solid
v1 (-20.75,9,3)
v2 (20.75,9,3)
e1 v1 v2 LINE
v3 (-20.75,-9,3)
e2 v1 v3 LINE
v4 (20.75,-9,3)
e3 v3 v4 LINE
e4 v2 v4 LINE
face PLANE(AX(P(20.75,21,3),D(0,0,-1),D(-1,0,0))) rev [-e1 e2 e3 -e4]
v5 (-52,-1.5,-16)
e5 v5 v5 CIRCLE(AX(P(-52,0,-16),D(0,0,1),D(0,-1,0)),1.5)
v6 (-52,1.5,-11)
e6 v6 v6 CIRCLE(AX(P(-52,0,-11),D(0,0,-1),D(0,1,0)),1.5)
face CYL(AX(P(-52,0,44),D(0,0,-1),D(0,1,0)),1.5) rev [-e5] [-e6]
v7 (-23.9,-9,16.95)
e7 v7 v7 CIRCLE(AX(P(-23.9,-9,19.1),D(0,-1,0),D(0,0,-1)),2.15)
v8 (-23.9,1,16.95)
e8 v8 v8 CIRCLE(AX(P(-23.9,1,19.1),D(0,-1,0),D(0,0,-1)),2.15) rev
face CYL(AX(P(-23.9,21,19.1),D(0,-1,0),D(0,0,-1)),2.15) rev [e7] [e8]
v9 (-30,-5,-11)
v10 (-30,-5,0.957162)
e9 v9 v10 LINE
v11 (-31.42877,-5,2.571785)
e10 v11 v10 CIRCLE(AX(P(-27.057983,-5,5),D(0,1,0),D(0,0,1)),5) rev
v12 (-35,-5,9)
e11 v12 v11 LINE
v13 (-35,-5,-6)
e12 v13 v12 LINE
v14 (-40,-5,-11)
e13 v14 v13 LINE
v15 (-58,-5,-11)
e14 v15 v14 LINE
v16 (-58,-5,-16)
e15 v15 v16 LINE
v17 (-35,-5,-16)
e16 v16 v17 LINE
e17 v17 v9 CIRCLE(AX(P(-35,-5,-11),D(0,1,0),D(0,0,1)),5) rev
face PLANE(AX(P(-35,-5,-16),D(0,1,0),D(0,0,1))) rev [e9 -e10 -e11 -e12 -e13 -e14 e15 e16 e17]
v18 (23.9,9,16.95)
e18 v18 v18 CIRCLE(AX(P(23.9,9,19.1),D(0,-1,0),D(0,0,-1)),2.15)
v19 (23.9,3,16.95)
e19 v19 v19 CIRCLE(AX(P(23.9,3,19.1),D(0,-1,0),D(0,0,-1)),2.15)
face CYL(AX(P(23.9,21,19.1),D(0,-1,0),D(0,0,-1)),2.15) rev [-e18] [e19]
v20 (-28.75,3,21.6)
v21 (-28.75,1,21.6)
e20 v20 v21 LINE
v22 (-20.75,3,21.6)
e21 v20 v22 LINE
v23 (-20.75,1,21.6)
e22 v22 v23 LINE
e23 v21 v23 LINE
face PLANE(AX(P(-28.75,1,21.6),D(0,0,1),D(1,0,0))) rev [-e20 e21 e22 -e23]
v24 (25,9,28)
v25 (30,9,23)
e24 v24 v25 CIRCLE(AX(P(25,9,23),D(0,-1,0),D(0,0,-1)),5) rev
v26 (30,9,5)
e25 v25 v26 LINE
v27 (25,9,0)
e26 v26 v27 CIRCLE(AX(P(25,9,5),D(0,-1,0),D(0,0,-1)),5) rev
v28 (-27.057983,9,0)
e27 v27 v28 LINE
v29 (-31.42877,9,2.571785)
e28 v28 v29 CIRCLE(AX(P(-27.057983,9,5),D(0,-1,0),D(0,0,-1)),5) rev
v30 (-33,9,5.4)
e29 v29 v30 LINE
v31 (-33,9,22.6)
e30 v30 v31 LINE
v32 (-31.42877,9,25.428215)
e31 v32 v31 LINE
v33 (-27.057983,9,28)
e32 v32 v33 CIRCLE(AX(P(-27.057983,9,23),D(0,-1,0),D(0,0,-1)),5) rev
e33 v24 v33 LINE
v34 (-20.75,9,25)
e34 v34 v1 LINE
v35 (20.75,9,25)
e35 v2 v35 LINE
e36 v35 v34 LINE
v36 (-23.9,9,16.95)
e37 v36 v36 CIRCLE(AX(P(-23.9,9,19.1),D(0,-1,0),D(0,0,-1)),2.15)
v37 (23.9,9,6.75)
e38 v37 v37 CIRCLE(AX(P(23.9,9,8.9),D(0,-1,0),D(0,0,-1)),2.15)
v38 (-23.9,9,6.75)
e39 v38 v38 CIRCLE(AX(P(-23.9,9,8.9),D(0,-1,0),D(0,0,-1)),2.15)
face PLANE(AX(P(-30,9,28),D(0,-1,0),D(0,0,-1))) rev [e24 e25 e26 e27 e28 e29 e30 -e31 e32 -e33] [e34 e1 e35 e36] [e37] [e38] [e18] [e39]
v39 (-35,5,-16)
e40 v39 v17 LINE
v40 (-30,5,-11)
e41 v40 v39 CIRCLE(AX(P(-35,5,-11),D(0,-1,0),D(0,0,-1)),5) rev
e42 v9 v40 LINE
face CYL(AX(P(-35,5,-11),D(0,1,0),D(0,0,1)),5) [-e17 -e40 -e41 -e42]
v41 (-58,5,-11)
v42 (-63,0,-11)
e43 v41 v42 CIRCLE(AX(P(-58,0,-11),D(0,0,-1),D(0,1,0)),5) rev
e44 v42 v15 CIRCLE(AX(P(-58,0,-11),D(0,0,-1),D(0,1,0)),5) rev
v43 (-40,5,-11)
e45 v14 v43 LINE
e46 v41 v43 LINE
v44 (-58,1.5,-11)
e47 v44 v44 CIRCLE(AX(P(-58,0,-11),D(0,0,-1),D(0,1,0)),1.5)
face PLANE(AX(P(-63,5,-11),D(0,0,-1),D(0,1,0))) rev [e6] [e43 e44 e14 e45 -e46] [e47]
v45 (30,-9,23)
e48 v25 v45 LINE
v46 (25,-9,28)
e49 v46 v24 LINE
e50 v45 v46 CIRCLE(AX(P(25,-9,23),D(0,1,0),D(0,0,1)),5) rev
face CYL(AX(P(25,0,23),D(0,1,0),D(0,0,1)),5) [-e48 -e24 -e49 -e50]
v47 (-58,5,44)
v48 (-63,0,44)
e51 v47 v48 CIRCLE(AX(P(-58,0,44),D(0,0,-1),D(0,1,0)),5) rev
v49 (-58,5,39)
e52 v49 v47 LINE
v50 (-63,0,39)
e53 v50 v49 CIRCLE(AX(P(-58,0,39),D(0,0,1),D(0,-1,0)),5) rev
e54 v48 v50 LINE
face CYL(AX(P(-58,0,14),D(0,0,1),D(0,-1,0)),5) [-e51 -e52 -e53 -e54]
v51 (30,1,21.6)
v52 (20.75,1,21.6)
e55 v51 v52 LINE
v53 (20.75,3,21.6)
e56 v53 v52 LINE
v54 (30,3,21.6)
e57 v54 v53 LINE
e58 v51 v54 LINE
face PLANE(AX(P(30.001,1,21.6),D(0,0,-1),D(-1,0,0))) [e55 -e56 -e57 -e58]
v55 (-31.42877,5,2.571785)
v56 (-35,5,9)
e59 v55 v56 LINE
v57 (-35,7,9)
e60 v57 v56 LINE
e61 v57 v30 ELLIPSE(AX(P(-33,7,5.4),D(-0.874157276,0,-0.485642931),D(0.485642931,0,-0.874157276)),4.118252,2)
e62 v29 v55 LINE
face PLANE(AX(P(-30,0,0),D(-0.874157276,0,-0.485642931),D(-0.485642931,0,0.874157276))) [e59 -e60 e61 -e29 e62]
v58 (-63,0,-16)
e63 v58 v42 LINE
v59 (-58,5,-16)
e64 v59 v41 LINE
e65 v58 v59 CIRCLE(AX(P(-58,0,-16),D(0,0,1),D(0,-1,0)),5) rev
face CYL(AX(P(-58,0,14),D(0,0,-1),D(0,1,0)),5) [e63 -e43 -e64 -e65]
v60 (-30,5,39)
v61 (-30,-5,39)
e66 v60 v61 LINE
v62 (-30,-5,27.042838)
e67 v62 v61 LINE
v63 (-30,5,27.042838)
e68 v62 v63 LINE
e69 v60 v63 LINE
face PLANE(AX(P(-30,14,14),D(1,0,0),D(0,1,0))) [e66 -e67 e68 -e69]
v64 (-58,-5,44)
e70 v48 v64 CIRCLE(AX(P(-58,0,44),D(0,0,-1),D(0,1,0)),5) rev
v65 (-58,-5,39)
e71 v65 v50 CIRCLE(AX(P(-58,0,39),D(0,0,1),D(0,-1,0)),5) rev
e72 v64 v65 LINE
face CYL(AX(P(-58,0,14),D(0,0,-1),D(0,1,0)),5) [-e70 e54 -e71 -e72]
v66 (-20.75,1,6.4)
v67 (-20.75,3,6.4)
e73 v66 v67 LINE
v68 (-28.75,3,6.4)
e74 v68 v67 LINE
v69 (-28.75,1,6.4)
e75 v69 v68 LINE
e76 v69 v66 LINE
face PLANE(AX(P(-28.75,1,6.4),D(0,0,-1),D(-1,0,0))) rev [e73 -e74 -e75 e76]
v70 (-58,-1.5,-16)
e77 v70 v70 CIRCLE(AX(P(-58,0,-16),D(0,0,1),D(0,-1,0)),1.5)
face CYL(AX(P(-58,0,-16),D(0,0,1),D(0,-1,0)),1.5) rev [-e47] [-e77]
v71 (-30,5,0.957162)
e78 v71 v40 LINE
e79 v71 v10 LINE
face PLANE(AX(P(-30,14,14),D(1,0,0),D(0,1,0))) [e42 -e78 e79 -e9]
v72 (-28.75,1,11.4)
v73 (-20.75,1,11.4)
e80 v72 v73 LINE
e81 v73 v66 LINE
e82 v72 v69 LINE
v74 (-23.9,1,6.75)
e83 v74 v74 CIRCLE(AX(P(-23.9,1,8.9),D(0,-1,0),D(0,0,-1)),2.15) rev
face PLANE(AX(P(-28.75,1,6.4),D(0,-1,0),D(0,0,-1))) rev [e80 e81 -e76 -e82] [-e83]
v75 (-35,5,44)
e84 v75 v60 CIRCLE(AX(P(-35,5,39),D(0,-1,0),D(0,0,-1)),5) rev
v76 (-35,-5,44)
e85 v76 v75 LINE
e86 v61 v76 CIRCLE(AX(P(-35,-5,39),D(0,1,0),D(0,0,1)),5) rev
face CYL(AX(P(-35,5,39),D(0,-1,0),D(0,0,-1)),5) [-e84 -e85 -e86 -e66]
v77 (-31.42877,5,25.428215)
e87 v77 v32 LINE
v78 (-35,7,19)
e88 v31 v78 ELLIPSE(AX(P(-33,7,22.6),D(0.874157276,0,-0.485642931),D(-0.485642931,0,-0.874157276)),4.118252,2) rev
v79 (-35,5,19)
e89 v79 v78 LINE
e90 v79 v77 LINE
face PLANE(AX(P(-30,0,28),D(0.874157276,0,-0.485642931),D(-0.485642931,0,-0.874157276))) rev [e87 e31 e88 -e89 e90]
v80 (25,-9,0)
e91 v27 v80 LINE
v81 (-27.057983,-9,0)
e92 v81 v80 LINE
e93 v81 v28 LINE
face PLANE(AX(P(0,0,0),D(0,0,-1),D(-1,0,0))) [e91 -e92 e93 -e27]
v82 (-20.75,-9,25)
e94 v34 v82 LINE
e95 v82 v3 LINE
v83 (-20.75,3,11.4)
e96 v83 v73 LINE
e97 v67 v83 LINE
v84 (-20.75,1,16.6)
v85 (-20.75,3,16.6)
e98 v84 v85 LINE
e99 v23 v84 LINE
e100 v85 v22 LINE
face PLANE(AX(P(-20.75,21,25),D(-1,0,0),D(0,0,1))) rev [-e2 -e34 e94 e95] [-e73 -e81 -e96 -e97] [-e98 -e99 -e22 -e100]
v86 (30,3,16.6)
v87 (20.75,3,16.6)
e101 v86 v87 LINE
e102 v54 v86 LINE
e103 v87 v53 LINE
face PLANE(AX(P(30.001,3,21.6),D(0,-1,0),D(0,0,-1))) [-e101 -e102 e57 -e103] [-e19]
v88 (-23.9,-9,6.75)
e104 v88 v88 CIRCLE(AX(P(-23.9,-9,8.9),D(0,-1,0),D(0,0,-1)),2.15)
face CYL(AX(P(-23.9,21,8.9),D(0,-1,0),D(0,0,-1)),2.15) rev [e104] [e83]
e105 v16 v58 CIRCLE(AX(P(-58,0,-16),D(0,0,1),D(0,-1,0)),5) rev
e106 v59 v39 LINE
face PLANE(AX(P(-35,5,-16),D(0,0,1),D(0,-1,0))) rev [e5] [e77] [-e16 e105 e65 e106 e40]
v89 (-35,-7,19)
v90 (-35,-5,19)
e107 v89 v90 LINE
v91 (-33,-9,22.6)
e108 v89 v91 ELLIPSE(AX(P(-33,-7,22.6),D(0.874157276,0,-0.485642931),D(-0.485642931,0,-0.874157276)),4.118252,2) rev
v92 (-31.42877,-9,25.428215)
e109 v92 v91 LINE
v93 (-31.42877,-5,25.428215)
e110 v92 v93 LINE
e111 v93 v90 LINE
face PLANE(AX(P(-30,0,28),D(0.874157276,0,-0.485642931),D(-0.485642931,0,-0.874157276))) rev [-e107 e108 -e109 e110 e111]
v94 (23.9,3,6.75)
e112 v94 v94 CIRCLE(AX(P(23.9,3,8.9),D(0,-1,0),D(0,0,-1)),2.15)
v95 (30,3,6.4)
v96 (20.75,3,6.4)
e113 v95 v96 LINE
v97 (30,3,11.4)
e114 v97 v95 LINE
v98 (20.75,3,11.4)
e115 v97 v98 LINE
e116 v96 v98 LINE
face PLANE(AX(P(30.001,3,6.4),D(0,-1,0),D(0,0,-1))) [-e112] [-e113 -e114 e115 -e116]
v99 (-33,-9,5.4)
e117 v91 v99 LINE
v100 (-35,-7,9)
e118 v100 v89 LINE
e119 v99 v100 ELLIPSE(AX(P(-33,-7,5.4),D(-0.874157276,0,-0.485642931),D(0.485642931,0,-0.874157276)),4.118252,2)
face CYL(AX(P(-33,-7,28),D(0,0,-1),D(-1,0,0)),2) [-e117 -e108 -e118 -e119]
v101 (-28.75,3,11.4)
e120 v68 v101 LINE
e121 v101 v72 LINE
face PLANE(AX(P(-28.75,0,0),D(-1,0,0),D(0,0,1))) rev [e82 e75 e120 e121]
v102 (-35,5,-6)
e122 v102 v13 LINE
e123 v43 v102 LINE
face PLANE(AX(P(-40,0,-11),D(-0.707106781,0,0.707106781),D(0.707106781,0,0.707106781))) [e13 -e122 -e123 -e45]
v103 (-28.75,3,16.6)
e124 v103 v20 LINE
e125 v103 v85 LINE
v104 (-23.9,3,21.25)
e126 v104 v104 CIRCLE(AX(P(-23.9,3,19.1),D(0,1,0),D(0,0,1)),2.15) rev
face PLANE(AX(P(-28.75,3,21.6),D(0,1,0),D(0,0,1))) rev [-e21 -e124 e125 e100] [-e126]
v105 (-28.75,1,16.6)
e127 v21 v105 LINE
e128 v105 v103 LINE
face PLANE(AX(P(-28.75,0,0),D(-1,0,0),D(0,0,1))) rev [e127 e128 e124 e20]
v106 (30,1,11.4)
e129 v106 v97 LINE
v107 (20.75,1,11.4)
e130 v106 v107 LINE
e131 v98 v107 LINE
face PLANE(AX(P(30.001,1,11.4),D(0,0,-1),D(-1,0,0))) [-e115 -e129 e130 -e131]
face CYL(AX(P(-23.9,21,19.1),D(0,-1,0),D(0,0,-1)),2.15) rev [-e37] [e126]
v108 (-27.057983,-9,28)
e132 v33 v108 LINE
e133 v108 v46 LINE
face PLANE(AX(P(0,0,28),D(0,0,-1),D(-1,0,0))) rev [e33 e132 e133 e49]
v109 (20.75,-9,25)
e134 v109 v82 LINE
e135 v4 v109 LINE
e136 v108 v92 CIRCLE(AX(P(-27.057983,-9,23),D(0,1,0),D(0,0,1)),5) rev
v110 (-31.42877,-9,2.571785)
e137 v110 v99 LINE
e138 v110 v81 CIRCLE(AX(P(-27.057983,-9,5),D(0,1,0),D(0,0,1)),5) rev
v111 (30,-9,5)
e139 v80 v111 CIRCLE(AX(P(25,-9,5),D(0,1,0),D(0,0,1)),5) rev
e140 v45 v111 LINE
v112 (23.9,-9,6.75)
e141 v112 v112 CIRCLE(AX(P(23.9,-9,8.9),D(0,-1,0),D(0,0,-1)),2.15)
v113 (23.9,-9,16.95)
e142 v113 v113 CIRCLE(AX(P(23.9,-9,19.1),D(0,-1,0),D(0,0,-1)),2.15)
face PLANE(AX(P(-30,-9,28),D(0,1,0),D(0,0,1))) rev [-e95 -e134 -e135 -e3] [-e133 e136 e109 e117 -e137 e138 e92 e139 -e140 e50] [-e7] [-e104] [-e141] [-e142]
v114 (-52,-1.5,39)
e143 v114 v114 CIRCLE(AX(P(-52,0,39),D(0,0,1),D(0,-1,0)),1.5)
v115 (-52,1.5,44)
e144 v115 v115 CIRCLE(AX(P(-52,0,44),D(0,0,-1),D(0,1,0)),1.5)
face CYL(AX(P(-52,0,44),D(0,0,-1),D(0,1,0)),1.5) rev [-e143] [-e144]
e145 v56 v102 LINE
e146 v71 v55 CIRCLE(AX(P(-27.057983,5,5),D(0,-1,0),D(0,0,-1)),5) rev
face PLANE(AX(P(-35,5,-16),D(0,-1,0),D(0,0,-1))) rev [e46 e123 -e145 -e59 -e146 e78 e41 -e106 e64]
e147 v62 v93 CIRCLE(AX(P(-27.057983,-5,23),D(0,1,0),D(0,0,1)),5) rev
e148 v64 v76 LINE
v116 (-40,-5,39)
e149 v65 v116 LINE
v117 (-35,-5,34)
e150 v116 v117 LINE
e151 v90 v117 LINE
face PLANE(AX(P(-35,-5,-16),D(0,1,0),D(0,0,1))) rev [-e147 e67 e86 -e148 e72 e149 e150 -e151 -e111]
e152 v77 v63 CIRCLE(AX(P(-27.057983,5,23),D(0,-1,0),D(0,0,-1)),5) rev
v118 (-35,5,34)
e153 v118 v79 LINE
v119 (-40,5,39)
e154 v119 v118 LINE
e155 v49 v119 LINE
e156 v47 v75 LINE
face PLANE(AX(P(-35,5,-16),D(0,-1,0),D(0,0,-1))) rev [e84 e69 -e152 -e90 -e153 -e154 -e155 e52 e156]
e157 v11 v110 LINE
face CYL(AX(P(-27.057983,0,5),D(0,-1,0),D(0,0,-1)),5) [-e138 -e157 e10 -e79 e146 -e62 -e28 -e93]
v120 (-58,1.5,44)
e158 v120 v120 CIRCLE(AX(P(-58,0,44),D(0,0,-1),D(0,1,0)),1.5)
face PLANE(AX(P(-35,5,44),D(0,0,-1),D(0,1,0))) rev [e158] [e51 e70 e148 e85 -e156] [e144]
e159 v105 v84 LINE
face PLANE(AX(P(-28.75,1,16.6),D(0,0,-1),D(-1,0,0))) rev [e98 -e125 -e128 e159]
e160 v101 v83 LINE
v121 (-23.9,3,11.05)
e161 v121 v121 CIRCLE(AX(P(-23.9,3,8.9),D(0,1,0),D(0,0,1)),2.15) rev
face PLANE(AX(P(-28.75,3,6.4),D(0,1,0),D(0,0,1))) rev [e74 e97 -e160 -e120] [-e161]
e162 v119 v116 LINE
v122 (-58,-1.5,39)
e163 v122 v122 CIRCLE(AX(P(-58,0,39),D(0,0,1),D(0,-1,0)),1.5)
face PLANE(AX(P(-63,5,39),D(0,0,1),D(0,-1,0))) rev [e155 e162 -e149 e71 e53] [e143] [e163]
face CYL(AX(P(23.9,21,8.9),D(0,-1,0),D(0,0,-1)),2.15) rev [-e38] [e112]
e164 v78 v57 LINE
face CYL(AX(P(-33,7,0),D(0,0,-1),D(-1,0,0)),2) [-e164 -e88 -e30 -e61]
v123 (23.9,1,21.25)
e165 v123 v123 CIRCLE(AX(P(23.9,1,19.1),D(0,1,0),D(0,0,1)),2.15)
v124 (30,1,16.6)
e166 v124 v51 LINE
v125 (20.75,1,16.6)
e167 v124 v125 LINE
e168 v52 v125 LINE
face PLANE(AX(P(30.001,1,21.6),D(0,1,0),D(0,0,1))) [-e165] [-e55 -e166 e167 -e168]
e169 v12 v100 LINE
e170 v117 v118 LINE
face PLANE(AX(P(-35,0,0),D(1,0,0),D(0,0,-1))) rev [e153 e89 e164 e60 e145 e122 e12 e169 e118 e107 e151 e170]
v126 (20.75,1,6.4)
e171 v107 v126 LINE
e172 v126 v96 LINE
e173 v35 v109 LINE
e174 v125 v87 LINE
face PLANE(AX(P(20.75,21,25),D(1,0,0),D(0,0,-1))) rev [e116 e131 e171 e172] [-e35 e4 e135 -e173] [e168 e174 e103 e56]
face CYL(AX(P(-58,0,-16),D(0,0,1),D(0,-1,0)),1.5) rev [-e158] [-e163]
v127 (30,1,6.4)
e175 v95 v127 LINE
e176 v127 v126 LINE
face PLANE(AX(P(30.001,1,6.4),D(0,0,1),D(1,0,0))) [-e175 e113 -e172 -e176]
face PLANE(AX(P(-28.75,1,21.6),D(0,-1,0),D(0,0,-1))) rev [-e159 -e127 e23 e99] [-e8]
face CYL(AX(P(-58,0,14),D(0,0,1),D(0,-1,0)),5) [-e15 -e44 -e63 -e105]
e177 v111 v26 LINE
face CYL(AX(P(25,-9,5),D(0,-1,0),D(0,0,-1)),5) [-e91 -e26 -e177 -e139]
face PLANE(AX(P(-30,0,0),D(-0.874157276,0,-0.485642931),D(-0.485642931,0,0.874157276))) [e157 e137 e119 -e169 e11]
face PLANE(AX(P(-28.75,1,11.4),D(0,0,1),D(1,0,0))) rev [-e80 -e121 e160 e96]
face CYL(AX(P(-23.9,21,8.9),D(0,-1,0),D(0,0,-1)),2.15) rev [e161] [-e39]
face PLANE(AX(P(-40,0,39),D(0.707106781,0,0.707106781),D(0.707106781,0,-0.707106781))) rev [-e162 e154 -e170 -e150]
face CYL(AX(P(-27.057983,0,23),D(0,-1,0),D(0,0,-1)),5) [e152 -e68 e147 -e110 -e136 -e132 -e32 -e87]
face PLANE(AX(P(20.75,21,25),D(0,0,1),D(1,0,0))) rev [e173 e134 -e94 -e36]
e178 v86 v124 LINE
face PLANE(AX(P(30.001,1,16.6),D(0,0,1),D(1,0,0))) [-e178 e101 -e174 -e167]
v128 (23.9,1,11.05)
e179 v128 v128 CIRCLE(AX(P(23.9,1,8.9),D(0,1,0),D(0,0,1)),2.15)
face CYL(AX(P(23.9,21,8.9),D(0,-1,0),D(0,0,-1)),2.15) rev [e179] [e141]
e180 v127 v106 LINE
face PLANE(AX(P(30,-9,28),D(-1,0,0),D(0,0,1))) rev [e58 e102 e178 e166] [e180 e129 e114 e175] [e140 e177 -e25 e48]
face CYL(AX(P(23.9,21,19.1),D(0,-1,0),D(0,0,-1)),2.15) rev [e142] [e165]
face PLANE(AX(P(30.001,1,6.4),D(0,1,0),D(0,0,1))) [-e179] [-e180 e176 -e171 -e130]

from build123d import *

# Parameters (mm, degrees)
ESQUISSE1_W                         = 60
ESQUISSE1_H                         = 18
BOSS_EXTRU_1_DEPTH                  = 28
ESQUISSE2_W                         = 41.5
ESQUISSE2_H                         = 22
ENL_V_MAT_EXTRU_1_DEPTH             = 30
ESQUISSE3_R                         = 2.15
ENL_V_MAT_EXTRU_2_DEPTH             = 30
ESQUISSE5_W                         = 10
ESQUISSE5_H                         = 60
BOSS_EXTRU_2_DEPTH                  = 5
ESQUISSE6_W                         = 10
ESQUISSE6_H                         = 5
BOSS_EXTRU_3_DEPTH                  = 28
ESQUISSE7_R                         = 1.5
ENL_V_MAT_EXTRU_4_DEPTH             = 92.394748208
NERVURE11_REACH                     = 77.186
ESQUISSE8_WALL_W                    = 162.668500034
ESQUISSE8_WALL_H                    = 18
CONG_5_R                            = 5
CONG_6_R                            = 5
NERVURE12_REACH                     = 73.169
ESQUISSE10_WALL_W                   = 151.408694602
ESQUISSE10_WALL_H                   = 10
CONG_7_R                            = 5
ESQUISSE12_W                        = 5
ESQUISSE12_H                        = 2
ENL_V_MAT_EXTRU_5_DEPTH             = 8
ENL_V_MAT_EXTRU_5_DIRECTION_2_REACH = 67.265
R_P_TITION_CIRCULAIRE1_COUNT        = 3
R_P_TITION_CIRCULAIRE1_ANGLE        = 180
ENL_V_MAT_EXTRU_8_DEPTH             = 79.064076245
ENL_V_MAT_EXTRU_8_DEPTH_BACK        = 79.064076245
CONG_8_R                            = 5
CONG_10_R                           = 5
CONG_12_R                           = 2
NERVURE13_REACH                     = 79.369
ESQUISSE22_WALL_W                   = 163.809556882
ESQUISSE22_WALL_H                   = 10
ENL_V_MAT_EXTRU_10_DEPTH            = 88.464278423
ENL_V_MAT_EXTRU_10_DEPTH_BACK       = 88.464278423
ESQUISSE24_R                        = 1.5


with BuildPart() as part:
    # Esquisse1 → Boss.-Extru.1 (new body)
    with BuildSketch(Plane.XY):
        Rectangle(ESQUISSE1_W, ESQUISSE1_H)
    extrude(amount=BOSS_EXTRU_1_DEPTH)

    # Esquisse2 → Enlèv. mat.-Extru.1 (cut)
    with BuildSketch(Plane.XZ.offset(9)):
        with Locations((0, 14)):
            Rectangle(ESQUISSE2_W, ESQUISSE2_H)
    extrude(amount=-ENL_V_MAT_EXTRU_1_DEPTH, mode=Mode.SUBTRACT)

    # Esquisse3 → Enlèv. mat.-Extru.2 (cut)
    with BuildSketch(Plane(origin=(0, -9, 0), x_dir=(-1, 0, 0), z_dir=(0, -1, 0))):
        with Locations(Location((23.9, -19.1, 0), (0, 0, 90))):
            Circle(ESQUISSE3_R)
        with Locations(Location((23.9, -8.9, 0), (0, 0, 90))):
            Circle(ESQUISSE3_R)
        with Locations(Location((-23.9, -8.9, 0), (0, 0, 90))):
            Circle(ESQUISSE3_R)
        with Locations(Location((-23.9, -19.1, 0), (0, 0, 90))):
            Circle(ESQUISSE3_R)
    extrude(amount=-ENL_V_MAT_EXTRU_2_DEPTH, mode=Mode.SUBTRACT)

    # Esquisse5 → Boss.-Extru.2 (add)
    with BuildSketch(Plane.ZY.offset(30)):
        with Locations((14, 0)):
            Rectangle(ESQUISSE5_W, ESQUISSE5_H)
    boss_extru_2 = extrude(amount=BOSS_EXTRU_2_DEPTH)

    # Esquisse6 → Boss.-Extru.3 (add)
    with BuildSketch(Plane.ZY.offset(35)):
        with Locations((14, 27.5)):
            Rectangle(ESQUISSE6_W, ESQUISSE6_H)
        with Locations((14, -27.5)):
            Rectangle(ESQUISSE6_W, ESQUISSE6_H)
    boss_extru_3 = extrude(amount=BOSS_EXTRU_3_DEPTH)

    # Esquisse7 → Enlèv. mat.-Extru.4 (cut, symmetric)
    with BuildSketch(Plane(origin=(0, 30, 0), x_dir=(1, 0, 0), z_dir=(0, 1, 0))):
        with Locations(Location((-58, -14, 0), (0, 0, 270))):
            Circle(ESQUISSE7_R)
    enl_v_mat_extru_4 = extrude(amount=ENL_V_MAT_EXTRU_4_DEPTH, both=True, mode=Mode.SUBTRACT)

    # Esquisse8 wall → Nervure11 (add, up to next)
    with BuildSketch(Plane(origin=(-32.5, 0, 23.5), x_dir=(-0.485642931179, 0, -0.874157276122), z_dir=(-0.874157276122, 0, 0.485642931179)), mode=Mode.PRIVATE) as nervure11_sk1:
        Rectangle(ESQUISSE8_WALL_W, ESQUISSE8_WALL_H)
    nervure11_tool1 = extrude(nervure11_sk1.sketch, amount=-NERVURE11_REACH, mode=Mode.PRIVATE) - part.part
    nervure11 = nervure11_tool1.solids().sort_by_distance((-32.5, 0, 23.5))[0]
    add(nervure11)

    # Symétrie1: Nervure11 across plane
    add(nervure11.mirror(Plane.XY.offset(14)))

    # Congé5
    cong_5_edges = [part.edges().sort_by_distance(p)[0] for p in [
        (-30, 0, 28),
        (30, 0, 28),
        (-30, 0, 0),
        (30, 0, 0),
    ]]
    fillet(cong_5_edges, radius=CONG_5_R)

    # Congé6
    cong_6_edges = [part.edges().sort_by_distance(p)[0] for p in [
        (-30, 30, 14),
        (-30, -30, 14),
    ]]
    fillet(cong_6_edges, radius=CONG_6_R)

    # Esquisse10 wall → Nervure12 (add, up to next)
    with BuildSketch(Plane(origin=(-37.5, 22.5, 14), x_dir=(0.707106781187, -0.707106781187, 0), z_dir=(0.707106781187, 0.707106781187, 0)), mode=Mode.PRIVATE) as nervure12_sk1:
        Rectangle(ESQUISSE10_WALL_W, ESQUISSE10_WALL_H)
    nervure12_tool1 = extrude(nervure12_sk1.sketch, amount=NERVURE12_REACH, mode=Mode.PRIVATE) - part.part
    nervure12 = nervure12_tool1.solids().sort_by_distance((-37.5, 22.5, 14))[0]
    add(nervure12)

    # Symétrie2: Nervure12 across plane
    add(nervure12.mirror(Plane.ZX))

    # Congé7
    cong_7_edges = [part.edges().sort_by_distance(p)[0] for p in [
        (-63, -27.5, 9),
        (-63, -27.5, 19),
        (-63, 27.5, 9),
        (-63, 27.5, 19),
    ]]
    fillet(cong_7_edges, radius=CONG_7_R - 0.0001)  # a hair under: the kernel refuses the full size

    # Esquisse12 → Enlèv. mat.-Extru.5 (cut)
    with BuildSketch(Plane(origin=(-20.75, 0, 0), x_dir=(0, 0, -1), z_dir=(1, 0, 0))):
        with Locations((-19.1, 2)):
            Rectangle(ESQUISSE12_W, ESQUISSE12_H)
        with Locations((-8.9, 2)):
            Rectangle(ESQUISSE12_W, ESQUISSE12_H)
    extrude(amount=-ENL_V_MAT_EXTRU_5_DEPTH, mode=Mode.SUBTRACT)

    # Esquisse12 → Enlèv. mat.-Extru.5 direction 2 (cut, up to next)
    with BuildSketch(Plane(origin=(-20.75, 0, 0), x_dir=(0, 0, -1), z_dir=(1, 0, 0)), mode=Mode.PRIVATE) as enl_v_mat_extru_5_direction_2_sk1:
        with Locations((-19.1, 2)):
            Rectangle(ESQUISSE12_W, ESQUISSE12_H)
    enl_v_mat_extru_5_direction_2_tool1 = extrude(enl_v_mat_extru_5_direction_2_sk1.sketch, amount=ENL_V_MAT_EXTRU_5_DIRECTION_2_REACH, mode=Mode.PRIVATE) & part.part
    # Esquisse12 → Enlèv. mat.-Extru.5 direction 2 (cut, up to next)
    with BuildSketch(Plane(origin=(-20.75, 0, 0), x_dir=(0, 0, -1), z_dir=(1, 0, 0)), mode=Mode.PRIVATE) as enl_v_mat_extru_5_direction_2_sk2:
        with Locations((-8.9, 2)):
            Rectangle(ESQUISSE12_W, ESQUISSE12_H)
    enl_v_mat_extru_5_direction_2_tool2 = extrude(enl_v_mat_extru_5_direction_2_sk2.sketch, amount=ENL_V_MAT_EXTRU_5_DIRECTION_2_REACH, mode=Mode.PRIVATE) & part.part
    add(enl_v_mat_extru_5_direction_2_tool1.solids().sort_by_distance((-20.75, 2, 19.1))[0], mode=Mode.SUBTRACT)
    add(enl_v_mat_extru_5_direction_2_tool2.solids().sort_by_distance((-20.75, 2, 8.9))[0], mode=Mode.SUBTRACT)

    # Répétition circulaire1: Boss.-Extru.2, Boss.-Extru.3, Enlèv. mat.-Extru.4 ×3 about axis
    r_p_tition_circulaire1_axis = Axis((-35, 0, 14), (-1, 0, 0))
    add([boss_extru_2.rotate(r_p_tition_circulaire1_axis, i * R_P_TITION_CIRCULAIRE1_ANGLE / (R_P_TITION_CIRCULAIRE1_COUNT - 1)) for i in range(1, R_P_TITION_CIRCULAIRE1_COUNT)])
    add([boss_extru_3.rotate(r_p_tition_circulaire1_axis, i * R_P_TITION_CIRCULAIRE1_ANGLE / (R_P_TITION_CIRCULAIRE1_COUNT - 1)) for i in range(1, R_P_TITION_CIRCULAIRE1_COUNT)])
    add([enl_v_mat_extru_4.rotate(r_p_tition_circulaire1_axis, i * R_P_TITION_CIRCULAIRE1_ANGLE / (R_P_TITION_CIRCULAIRE1_COUNT - 1)) for i in range(1, R_P_TITION_CIRCULAIRE1_COUNT)], mode=Mode.SUBTRACT)

    # Esquisse21 → Enlèv. mat.-Extru.8 (cut, two sides: drawn at the far end of the back side and taken through both)
    with BuildSketch(Plane(origin=(0, 0, 9), x_dir=(-1, 0, 0), z_dir=(0, 0, -1)).offset(-ENL_V_MAT_EXTRU_8_DEPTH_BACK)):
        Polygon((63, -25), (40, -25), (35, -20), (35, -9), (30, -9), (30, -30), (63, -30), align=None)
        Polygon((35, 20), (40, 25), (63, 25), (63, 30), (30, 30), (30, 9), (35, 9), align=None)
    extrude(amount=ENL_V_MAT_EXTRU_8_DEPTH + ENL_V_MAT_EXTRU_8_DEPTH_BACK, mode=Mode.SUBTRACT)

    # Congé8
    cong_8_edges = [part.edges().sort_by_distance(p)[0] for p in [
        (-30, 0, 44),
        (-30, 0, -16),
    ]]
    fillet(cong_8_edges, radius=CONG_8_R)

    # Congé10
    cong_10_edges = [part.edges().sort_by_distance(p)[0] for p in [
        (-63, 5, -13.5),
        (-63, -5, -13.5),
        (-63, -5, 41.5),
        (-63, 5, 41.5),
    ]]
    fillet(cong_10_edges, radius=CONG_10_R - 0.0001)  # a hair under: the kernel refuses the full size

    # Congé12
    cong_12_edges = [part.edges().sort_by_distance(p)[0] for p in [
        (-35, -9, 14),
        (-35, 9, 14),
    ]]
    fillet(cong_12_edges, radius=CONG_12_R)

    # Esquisse22 wall → Nervure13 (add, up to next)
    with BuildSketch(Plane(origin=(-37.5, 0, -8.5), x_dir=(0.707106781187, 0, 0.707106781187), z_dir=(0.707106781187, 0, -0.707106781187)), mode=Mode.PRIVATE) as nervure13_sk1:
        Rectangle(ESQUISSE22_WALL_W, ESQUISSE22_WALL_H)
    nervure13_tool1 = extrude(nervure13_sk1.sketch, amount=NERVURE13_REACH, mode=Mode.PRIVATE) - part.part
    nervure13 = nervure13_tool1.solids().sort_by_distance((-37.5, 0, -8.5))[0]
    add(nervure13)

    # Symétrie3: Nervure13 across plane
    add(nervure13.mirror(Plane(origin=(0, 0, 14), x_dir=(1, 0, 0), z_dir=(0, 0, -1))))

    # Esquisse24 → Enlèv. mat.-Extru.10 (cut, two sides: drawn at the far end of the back side and taken through both)
    with BuildSketch(Plane(origin=(0, 0, -16), x_dir=(-1, 0, 0), z_dir=(0, 0, -1)).offset(-ENL_V_MAT_EXTRU_10_DEPTH_BACK)):
        with Locations(Location((52, 0, 0), (0, 0, 90))):
            Circle(ESQUISSE24_R)
    extrude(amount=ENL_V_MAT_EXTRU_10_DEPTH + ENL_V_MAT_EXTRU_10_DEPTH_BACK, mode=Mode.SUBTRACT)


solid = part.part
